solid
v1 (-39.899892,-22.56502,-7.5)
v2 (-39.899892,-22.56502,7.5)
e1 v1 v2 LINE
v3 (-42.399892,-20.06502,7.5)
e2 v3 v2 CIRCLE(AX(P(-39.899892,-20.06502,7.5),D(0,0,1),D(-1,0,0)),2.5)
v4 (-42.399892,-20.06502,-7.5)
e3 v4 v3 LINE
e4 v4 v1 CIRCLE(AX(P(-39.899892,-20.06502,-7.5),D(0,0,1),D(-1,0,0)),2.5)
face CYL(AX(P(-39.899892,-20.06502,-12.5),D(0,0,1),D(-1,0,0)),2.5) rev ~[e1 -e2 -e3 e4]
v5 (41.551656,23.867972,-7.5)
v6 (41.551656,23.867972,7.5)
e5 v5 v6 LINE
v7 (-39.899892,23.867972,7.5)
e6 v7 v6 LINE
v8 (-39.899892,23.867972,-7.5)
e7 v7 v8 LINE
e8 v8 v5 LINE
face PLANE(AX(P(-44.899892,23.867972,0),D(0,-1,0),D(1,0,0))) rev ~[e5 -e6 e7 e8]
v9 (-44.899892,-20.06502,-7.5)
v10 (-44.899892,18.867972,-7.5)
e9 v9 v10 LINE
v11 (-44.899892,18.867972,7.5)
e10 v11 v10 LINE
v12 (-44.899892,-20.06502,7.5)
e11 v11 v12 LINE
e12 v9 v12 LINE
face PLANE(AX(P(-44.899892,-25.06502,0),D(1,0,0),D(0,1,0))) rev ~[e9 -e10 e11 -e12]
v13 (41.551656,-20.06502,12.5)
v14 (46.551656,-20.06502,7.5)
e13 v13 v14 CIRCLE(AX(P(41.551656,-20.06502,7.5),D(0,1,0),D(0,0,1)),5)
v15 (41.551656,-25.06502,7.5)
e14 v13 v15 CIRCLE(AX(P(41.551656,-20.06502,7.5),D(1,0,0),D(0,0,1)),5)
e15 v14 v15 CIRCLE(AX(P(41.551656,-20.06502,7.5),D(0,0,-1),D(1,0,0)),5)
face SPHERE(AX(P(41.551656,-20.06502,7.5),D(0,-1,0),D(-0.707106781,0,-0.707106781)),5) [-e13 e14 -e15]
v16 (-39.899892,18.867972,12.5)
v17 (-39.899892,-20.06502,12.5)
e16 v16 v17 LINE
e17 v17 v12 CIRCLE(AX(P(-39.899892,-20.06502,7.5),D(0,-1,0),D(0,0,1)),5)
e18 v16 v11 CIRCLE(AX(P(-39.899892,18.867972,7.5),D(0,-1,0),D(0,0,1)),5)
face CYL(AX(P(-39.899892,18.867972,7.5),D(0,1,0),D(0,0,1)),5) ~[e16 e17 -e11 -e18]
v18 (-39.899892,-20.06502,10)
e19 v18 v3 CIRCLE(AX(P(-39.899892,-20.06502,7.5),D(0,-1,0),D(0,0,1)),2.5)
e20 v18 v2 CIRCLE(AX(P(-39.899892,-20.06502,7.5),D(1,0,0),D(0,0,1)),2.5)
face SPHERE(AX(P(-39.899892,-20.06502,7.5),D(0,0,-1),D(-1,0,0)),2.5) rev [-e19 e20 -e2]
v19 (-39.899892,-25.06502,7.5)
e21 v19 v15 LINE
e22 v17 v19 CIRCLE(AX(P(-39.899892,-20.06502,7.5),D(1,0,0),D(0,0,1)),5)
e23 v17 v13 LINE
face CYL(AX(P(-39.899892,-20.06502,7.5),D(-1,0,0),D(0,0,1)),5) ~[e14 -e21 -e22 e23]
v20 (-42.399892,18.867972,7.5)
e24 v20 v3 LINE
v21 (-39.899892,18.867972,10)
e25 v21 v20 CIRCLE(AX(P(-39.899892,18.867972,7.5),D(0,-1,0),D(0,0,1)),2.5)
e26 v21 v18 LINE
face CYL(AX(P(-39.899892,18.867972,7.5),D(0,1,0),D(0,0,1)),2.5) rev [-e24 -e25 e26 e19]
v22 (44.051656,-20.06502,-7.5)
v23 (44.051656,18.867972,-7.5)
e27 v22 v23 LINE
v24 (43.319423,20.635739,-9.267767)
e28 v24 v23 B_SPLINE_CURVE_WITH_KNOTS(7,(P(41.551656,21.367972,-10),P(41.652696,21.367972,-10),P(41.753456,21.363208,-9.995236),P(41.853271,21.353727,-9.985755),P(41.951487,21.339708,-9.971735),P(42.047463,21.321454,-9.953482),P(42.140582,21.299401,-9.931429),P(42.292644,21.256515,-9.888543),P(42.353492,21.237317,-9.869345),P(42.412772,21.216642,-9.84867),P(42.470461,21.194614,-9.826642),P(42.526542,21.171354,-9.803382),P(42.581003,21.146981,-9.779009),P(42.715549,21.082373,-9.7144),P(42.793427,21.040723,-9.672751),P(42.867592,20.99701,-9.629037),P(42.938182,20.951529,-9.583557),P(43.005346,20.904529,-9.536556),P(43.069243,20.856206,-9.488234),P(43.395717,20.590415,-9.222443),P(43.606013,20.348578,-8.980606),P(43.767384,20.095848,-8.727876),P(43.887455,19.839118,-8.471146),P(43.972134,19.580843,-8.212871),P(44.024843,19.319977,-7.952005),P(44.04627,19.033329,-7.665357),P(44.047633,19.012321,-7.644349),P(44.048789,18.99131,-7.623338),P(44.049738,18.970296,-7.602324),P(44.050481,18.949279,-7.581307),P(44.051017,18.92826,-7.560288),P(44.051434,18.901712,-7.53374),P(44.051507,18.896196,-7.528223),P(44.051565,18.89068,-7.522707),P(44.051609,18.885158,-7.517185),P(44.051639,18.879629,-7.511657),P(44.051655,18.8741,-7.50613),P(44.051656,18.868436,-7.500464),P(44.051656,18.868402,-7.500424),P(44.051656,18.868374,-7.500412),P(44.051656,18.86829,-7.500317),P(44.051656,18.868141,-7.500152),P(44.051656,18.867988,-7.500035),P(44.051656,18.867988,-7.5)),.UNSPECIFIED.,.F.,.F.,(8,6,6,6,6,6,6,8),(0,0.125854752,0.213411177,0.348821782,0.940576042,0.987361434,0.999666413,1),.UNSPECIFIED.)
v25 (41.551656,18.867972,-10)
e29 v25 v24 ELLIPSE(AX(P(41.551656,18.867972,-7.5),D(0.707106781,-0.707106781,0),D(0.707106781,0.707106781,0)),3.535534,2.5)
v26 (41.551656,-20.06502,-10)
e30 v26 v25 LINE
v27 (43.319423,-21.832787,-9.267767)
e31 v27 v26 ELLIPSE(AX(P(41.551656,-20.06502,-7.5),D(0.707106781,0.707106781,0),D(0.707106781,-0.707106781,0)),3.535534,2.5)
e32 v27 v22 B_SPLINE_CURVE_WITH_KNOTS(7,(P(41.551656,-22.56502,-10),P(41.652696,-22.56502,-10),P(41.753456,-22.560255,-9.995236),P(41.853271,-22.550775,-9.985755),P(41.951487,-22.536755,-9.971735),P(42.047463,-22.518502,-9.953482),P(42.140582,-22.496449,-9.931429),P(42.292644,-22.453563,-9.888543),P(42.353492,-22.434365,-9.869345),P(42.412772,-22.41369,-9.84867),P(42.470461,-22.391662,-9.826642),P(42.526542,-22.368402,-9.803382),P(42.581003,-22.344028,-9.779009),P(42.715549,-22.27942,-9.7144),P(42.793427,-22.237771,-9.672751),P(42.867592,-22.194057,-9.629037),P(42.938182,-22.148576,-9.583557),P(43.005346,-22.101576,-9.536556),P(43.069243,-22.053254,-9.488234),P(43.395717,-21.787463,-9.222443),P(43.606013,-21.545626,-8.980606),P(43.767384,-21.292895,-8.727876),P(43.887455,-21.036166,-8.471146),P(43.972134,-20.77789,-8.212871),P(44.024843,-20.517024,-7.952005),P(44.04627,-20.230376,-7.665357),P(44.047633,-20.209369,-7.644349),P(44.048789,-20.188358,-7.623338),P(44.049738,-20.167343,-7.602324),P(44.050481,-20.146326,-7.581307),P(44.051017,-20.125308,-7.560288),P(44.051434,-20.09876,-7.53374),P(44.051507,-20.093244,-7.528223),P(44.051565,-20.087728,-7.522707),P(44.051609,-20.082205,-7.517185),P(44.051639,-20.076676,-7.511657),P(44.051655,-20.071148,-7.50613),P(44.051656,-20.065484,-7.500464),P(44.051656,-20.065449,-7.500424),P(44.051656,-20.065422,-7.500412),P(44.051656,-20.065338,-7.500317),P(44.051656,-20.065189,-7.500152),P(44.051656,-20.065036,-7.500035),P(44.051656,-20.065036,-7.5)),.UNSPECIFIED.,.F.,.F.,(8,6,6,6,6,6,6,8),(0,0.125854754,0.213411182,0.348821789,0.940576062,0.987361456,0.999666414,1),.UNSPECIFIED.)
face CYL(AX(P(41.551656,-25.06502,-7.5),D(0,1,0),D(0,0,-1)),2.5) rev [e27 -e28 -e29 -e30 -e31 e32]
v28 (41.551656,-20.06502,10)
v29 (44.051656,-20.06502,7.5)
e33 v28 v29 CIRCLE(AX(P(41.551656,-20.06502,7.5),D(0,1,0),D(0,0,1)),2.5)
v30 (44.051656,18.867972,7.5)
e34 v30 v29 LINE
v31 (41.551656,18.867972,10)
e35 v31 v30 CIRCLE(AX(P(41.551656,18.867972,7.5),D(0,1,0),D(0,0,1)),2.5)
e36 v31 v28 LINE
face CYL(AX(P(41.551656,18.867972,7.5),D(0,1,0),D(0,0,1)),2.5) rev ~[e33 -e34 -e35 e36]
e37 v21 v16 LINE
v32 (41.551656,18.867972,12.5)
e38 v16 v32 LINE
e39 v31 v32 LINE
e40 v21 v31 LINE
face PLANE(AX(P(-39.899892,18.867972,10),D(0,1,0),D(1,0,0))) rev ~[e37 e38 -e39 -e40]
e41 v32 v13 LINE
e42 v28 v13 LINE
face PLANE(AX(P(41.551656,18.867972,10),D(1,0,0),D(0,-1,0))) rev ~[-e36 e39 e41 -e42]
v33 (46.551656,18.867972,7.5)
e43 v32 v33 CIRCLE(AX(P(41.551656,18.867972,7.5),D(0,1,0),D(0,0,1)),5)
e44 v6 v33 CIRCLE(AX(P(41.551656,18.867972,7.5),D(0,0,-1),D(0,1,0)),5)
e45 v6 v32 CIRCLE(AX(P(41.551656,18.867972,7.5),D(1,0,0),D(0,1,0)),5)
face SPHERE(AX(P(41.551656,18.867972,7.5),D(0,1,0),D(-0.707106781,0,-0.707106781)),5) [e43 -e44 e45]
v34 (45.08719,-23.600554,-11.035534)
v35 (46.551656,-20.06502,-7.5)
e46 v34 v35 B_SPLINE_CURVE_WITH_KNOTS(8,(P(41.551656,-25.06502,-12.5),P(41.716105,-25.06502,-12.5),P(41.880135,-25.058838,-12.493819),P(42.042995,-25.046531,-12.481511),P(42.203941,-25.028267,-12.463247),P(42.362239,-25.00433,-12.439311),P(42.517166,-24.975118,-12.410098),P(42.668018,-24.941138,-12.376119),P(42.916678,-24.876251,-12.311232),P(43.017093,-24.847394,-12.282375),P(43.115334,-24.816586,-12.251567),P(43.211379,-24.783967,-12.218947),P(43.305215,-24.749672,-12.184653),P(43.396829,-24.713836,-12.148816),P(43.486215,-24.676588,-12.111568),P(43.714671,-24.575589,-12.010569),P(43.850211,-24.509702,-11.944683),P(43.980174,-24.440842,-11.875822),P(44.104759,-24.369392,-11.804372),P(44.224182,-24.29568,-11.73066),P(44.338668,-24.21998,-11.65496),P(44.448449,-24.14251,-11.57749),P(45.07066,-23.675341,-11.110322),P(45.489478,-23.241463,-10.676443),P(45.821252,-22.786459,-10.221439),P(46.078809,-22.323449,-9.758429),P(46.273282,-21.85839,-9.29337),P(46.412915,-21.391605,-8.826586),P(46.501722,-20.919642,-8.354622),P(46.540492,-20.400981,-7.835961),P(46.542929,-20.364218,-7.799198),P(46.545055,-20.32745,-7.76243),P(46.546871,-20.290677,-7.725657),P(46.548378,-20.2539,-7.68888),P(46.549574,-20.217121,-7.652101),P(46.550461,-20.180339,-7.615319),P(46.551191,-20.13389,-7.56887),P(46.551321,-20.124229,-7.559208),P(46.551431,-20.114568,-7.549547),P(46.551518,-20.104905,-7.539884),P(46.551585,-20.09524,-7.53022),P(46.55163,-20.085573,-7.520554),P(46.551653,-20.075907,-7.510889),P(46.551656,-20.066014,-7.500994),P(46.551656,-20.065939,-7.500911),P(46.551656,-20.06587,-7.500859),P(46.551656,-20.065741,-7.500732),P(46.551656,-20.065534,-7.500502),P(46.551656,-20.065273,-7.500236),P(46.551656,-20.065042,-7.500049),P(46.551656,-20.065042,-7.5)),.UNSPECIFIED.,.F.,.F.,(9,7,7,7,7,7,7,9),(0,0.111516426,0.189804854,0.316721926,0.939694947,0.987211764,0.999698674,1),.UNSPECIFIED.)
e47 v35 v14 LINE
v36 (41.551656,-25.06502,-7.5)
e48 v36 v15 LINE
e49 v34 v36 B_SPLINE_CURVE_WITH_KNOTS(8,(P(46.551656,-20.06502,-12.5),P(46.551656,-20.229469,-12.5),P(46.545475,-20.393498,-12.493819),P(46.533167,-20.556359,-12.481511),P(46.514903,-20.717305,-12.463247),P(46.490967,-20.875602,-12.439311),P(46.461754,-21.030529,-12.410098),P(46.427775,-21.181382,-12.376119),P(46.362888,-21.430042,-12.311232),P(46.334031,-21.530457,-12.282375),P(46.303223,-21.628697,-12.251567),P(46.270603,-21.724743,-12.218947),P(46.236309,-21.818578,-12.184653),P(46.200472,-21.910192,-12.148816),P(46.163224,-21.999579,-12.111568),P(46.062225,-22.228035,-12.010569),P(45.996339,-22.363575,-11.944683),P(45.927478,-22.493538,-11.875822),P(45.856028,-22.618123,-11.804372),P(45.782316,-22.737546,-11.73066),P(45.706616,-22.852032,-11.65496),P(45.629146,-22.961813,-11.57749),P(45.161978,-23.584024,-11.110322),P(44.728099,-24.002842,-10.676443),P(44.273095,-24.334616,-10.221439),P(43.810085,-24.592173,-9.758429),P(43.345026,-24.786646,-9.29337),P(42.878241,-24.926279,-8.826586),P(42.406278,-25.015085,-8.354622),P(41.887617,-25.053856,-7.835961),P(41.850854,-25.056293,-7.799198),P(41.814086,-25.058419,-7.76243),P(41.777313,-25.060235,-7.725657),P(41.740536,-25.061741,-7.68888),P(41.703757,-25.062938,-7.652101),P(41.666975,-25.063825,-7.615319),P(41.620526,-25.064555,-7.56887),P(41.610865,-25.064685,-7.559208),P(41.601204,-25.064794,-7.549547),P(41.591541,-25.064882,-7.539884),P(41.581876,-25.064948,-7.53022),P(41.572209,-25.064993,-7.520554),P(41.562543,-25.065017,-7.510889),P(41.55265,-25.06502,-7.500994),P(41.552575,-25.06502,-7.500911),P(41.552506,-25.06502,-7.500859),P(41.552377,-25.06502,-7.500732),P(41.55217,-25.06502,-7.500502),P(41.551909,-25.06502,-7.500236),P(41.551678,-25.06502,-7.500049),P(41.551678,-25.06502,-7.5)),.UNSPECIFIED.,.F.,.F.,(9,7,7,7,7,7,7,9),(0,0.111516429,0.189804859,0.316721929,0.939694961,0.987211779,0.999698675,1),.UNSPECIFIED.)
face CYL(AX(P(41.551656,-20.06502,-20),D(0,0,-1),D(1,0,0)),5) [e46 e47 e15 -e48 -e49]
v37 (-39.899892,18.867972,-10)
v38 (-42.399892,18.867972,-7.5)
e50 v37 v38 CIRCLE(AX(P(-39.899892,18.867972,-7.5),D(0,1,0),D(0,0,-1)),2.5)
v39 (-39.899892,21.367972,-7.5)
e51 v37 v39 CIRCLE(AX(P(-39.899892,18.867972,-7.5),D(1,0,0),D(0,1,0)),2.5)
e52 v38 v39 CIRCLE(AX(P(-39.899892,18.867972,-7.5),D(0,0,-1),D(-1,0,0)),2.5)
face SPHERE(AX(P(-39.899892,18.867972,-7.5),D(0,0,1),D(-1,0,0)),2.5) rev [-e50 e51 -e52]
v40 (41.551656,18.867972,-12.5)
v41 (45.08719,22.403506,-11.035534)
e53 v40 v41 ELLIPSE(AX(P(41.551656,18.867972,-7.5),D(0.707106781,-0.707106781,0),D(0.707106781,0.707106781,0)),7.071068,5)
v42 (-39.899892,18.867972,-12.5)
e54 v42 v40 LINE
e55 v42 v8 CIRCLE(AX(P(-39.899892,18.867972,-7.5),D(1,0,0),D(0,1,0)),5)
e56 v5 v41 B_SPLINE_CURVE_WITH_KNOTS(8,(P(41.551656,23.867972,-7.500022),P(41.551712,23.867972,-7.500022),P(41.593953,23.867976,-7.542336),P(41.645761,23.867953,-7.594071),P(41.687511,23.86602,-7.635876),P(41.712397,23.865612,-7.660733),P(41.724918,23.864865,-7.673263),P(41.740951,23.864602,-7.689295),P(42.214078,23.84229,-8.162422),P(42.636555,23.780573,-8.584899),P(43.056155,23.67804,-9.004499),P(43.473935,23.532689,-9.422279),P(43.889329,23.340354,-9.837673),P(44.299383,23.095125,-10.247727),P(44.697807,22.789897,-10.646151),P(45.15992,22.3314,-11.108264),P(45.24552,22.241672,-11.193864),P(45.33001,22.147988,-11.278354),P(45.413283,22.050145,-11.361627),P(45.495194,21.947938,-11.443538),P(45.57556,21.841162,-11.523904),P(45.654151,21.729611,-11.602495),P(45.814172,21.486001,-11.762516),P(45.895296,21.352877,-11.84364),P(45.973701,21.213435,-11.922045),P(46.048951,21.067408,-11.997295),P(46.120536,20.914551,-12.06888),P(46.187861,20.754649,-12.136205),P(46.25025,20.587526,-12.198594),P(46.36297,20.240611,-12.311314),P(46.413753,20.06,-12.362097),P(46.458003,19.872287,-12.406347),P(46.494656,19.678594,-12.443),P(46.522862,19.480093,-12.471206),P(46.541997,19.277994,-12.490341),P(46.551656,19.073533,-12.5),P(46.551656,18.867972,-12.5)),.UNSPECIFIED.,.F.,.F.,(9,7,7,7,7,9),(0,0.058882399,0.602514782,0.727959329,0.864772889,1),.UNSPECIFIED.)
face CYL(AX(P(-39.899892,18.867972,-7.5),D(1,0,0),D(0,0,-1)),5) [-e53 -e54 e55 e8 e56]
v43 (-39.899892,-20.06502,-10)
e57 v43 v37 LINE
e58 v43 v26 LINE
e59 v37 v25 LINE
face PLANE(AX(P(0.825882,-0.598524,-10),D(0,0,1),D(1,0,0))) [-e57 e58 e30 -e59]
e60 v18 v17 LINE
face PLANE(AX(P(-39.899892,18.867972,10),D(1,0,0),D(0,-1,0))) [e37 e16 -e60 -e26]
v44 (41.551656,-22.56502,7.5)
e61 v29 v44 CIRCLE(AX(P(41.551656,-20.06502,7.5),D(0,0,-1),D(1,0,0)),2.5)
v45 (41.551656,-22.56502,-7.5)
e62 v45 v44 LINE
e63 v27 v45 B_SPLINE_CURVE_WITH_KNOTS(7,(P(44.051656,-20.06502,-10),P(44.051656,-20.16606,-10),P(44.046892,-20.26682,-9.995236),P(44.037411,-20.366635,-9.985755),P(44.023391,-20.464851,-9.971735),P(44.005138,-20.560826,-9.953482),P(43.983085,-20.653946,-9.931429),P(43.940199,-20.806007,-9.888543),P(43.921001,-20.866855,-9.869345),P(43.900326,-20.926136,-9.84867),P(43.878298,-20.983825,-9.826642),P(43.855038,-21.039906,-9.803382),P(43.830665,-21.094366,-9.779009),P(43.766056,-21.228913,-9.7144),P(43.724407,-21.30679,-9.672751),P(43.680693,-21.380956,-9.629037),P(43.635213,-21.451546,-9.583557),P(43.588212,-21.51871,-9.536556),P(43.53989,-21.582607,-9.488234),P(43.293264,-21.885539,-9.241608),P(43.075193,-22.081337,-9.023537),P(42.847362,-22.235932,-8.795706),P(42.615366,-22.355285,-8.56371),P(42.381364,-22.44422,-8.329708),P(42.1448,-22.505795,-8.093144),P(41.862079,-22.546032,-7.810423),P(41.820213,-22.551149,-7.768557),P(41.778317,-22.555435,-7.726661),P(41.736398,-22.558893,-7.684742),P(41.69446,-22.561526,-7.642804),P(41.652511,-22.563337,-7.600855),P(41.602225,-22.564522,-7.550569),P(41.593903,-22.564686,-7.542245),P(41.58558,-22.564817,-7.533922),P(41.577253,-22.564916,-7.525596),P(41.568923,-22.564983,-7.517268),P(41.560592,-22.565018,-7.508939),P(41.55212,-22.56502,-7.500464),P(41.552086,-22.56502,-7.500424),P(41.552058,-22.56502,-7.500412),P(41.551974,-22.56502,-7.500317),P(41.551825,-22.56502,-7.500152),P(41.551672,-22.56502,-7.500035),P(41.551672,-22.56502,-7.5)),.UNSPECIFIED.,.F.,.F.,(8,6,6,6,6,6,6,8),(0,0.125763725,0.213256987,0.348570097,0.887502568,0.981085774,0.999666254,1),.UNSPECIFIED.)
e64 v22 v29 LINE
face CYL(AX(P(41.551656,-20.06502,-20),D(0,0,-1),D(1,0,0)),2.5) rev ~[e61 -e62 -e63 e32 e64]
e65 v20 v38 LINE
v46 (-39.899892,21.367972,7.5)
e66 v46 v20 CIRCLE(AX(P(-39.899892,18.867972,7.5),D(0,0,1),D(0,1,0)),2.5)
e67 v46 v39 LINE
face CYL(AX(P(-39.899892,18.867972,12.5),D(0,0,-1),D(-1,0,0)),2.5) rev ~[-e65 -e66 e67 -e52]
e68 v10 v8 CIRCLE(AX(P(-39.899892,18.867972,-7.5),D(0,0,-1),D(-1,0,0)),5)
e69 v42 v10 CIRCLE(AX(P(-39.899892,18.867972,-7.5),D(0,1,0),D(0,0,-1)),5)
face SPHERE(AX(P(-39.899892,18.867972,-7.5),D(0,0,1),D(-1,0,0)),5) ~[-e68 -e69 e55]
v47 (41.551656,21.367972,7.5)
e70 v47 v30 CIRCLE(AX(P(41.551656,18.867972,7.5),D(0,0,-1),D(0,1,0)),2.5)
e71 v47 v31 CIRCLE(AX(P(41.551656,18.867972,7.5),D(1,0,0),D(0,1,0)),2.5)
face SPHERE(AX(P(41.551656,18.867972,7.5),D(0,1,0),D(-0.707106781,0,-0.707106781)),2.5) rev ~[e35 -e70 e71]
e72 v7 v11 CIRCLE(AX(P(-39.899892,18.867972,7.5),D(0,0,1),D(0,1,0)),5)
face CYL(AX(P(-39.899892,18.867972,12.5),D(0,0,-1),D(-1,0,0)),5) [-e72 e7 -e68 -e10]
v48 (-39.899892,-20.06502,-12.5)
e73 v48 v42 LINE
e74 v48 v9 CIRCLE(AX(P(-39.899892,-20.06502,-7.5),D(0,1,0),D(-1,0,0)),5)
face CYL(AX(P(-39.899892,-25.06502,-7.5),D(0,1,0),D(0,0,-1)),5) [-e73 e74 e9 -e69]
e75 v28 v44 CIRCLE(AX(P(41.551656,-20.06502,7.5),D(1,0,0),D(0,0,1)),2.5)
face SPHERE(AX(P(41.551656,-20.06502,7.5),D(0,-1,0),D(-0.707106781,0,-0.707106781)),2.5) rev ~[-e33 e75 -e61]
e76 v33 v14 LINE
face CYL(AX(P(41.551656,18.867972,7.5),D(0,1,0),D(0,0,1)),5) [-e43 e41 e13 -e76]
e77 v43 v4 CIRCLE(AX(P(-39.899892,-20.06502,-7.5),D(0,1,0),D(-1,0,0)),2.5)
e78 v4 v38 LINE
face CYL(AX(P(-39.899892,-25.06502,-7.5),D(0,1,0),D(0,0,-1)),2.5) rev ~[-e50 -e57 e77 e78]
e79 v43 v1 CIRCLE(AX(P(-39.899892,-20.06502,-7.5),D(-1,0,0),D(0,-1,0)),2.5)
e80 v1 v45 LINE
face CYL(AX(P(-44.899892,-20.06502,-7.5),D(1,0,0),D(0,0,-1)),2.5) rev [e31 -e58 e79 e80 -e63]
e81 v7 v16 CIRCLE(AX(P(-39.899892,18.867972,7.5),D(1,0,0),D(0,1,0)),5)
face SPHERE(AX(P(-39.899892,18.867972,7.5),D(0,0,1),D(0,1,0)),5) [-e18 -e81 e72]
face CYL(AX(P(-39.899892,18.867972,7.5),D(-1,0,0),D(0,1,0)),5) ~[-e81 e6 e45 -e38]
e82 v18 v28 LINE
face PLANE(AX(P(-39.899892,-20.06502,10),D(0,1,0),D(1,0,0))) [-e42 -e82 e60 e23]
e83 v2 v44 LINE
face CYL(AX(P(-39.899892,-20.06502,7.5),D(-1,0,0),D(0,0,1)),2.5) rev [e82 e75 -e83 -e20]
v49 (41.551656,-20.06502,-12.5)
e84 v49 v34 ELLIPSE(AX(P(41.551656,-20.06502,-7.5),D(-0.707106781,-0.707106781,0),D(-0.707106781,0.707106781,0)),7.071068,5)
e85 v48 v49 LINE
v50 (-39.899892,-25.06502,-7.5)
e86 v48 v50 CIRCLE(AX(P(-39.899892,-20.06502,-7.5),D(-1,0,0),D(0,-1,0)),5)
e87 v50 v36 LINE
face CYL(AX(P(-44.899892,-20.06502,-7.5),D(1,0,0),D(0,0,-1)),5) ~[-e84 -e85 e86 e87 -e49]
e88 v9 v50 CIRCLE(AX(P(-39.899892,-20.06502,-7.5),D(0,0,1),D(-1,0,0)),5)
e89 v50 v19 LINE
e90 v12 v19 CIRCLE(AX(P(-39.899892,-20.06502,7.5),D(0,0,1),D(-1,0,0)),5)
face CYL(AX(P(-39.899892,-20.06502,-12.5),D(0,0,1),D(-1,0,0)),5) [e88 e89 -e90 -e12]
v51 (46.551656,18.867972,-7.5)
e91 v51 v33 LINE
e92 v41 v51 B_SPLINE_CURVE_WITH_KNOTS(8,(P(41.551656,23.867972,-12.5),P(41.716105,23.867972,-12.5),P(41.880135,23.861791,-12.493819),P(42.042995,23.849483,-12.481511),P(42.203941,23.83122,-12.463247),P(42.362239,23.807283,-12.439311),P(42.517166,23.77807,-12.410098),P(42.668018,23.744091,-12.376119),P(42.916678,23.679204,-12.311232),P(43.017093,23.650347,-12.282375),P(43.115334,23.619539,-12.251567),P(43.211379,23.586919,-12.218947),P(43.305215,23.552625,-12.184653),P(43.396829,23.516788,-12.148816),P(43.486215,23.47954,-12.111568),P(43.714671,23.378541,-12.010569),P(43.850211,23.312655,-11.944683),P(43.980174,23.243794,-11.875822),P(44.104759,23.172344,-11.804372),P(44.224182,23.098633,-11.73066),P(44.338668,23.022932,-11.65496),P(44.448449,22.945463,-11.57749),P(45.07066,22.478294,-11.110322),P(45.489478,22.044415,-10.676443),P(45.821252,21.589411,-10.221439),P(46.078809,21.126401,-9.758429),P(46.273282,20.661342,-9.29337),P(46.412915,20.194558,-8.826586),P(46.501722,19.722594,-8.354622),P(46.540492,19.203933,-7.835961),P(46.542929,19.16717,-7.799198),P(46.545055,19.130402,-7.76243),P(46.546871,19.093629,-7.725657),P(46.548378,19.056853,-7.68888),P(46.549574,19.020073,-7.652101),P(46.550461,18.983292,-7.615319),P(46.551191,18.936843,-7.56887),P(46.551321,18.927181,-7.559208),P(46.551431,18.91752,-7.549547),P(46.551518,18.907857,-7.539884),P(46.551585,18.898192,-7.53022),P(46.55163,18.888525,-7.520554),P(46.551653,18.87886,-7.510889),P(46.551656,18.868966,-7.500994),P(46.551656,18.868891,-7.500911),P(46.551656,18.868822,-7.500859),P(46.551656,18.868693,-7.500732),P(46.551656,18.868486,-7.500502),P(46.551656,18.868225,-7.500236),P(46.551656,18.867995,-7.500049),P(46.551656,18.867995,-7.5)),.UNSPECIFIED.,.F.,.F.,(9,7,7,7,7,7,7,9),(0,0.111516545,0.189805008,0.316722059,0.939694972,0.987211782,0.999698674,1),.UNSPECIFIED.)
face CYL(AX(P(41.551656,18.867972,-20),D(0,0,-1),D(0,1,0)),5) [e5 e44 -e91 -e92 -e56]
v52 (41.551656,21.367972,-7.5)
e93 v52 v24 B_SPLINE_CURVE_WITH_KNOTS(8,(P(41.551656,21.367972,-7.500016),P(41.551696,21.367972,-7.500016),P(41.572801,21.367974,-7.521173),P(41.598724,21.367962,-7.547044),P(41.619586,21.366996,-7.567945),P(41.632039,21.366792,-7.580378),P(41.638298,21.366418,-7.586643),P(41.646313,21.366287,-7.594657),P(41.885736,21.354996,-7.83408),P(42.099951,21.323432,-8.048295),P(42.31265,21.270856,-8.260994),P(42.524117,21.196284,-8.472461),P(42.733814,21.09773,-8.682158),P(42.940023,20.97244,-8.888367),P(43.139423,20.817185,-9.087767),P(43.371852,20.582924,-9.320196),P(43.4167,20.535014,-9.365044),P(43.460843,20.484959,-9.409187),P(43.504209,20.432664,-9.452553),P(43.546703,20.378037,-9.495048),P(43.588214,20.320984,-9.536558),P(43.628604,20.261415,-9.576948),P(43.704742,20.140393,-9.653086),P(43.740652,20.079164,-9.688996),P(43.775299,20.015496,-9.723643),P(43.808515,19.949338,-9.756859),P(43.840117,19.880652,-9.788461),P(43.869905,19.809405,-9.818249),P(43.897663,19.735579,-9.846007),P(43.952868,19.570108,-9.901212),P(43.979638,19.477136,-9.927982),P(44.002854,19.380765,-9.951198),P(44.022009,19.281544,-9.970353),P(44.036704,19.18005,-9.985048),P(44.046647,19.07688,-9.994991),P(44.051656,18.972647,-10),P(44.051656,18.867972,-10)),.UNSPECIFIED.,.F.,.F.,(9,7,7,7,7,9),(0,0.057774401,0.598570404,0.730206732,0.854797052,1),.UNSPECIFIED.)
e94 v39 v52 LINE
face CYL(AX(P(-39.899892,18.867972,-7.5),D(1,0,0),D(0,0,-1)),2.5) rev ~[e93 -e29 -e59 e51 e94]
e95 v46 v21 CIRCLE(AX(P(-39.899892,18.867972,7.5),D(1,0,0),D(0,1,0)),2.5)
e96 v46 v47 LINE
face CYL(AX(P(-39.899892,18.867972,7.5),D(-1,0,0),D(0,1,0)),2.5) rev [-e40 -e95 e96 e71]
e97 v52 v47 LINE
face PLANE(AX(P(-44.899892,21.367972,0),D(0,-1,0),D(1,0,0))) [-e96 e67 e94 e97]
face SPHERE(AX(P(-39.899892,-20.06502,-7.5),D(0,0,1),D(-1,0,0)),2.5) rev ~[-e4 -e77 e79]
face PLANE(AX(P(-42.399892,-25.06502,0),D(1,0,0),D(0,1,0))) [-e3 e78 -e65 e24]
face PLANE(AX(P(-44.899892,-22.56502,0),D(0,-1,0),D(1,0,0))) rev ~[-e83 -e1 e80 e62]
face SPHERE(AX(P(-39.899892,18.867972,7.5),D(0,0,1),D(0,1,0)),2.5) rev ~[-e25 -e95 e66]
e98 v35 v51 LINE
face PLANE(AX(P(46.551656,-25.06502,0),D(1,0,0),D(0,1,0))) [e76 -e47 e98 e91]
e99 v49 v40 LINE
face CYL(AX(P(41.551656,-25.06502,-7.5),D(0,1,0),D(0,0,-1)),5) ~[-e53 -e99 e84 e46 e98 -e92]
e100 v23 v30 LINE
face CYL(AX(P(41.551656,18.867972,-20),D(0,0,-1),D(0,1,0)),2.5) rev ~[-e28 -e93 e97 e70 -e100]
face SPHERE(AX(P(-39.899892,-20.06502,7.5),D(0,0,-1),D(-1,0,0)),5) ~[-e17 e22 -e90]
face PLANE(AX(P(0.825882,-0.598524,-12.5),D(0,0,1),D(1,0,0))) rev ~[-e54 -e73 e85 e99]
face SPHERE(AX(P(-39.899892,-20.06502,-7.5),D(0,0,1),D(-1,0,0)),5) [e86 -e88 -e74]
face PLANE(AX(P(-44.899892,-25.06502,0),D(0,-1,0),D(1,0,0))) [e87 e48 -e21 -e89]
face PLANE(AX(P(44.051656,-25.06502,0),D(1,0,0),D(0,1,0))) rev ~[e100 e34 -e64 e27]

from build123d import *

# Parameters (mm, degrees)
F0_W         = 91.4515480399
F0_H         = 48.9329919219
F1_DEPTH     = 12.5
F2_R         = 5
F3_R         = 5
F4_T1_DEPTH  = 27.5
F4_T3_DEPTH  = 38.9329919219
F4_T5_DEPTH  = 81.4515480399
F4_S9_W      = 5.1
F4_S9_H      = 5.1
F4_T10_DEPTH = 5.1
F4_S15_W     = 5.1
F4_S15_H     = 5.1
F4_T16_DEPTH = 5.1
F4_T20_ANGLE = 90
F4_T22_ANGLE = 90
F5_T         = -2.5


# Not quite as in the source:
# - a fillet or chamfer that OpenCascade refuses, or shapes differently, is made with other operations: its cross-section is extruded or revolved along the edge and cut away or added
# - a shell that OpenCascade refuses in one call is made with other operations: the cavity is built on its own and cut out


with BuildPart() as f1:
    # F0 (on Top) → F1 (new body, symmetric)
    with BuildSketch(Plane.XY):
        with Locations((0.825881958, -0.5985237658)):
            Rectangle(F0_W, F0_H)
    extrude(amount=F1_DEPTH, both=True)

    # F2
    f2_edges = [f1.edges().sort_by_distance(p)[0] for p in [
        (-44.899892, 23.867972, 0),
    ]]
    fillet(f2_edges, radius=F2_R)

    # F3
    f3_edges = [f1.edges().sort_by_distance(p)[0] for p in [
        (-44.899892, -25.06502, 0),
        (3.325882, 23.867972, -12.5),
        (-43.435426, 22.403506, -12.5),
        (46.551656, -0.598524, -12.5),
        (-44.899892, -3.098524, -12.5),
        (0.825882, -25.06502, -12.5),
    ]]
    fillet(f3_edges, radius=F3_R)

    # F4: fillet of radius 5 on 9 edges, made by hand

    # F4_s2 → F4_t1 (cut)
    with BuildSketch(Plane.XY.offset(-20)):
        with BuildLine():
            ThreePointArc((41.551655978, 23.8679721951), (45.0871898839, 22.4035061011), (46.551655978, 18.8679721951))
            Line((46.551655978, 18.8679721951), (46.551655978, 23.8679721951))
            Line((46.551655978, 23.8679721951), (41.551655978, 23.8679721951))
        make_face()
        with BuildLine():
            ThreePointArc((46.551655978, -20.0650197268), (45.0871898839, -23.6005536327), (41.551655978, -25.0650197268))
            Line((41.551655978, -25.0650197268), (46.551655978, -25.0650197268))
            Line((46.551655978, -25.0650197268), (46.551655978, -20.0650197268))
        make_face()
    extrude(amount=F4_T1_DEPTH, mode=Mode.SUBTRACT)

    # F4_s4 → F4_t3 (cut)
    with BuildSketch(Plane.XZ.offset(-18.8679721951)):
        with BuildLine():
            ThreePointArc((41.551655978, 12.5), (45.0871898839, 11.0355339059), (46.551655978, 7.5))
            Line((46.551655978, 7.5), (46.551655978, 12.5))
            Line((46.551655978, 12.5), (41.551655978, 12.5))
        make_face()
        with BuildLine():
            ThreePointArc((-39.8998920619, 12.5), (-43.4354259679, 11.0355339059), (-44.8998920619, 7.5))
            Line((-44.8998920619, 7.5), (-44.8998920619, 12.5))
            Line((-44.8998920619, 12.5), (-39.8998920619, 12.5))
        make_face()
    extrude(amount=F4_T3_DEPTH, mode=Mode.SUBTRACT)

    # F4_s6 → F4_t5 (cut)
    with BuildSketch(Plane.YZ.offset(-39.8998920619)):
        with BuildLine():
            ThreePointArc((23.8679721951, 7.5), (22.4035061011, 11.0355339059), (18.8679721951, 12.5))
            Line((18.8679721951, 12.5), (23.8679721951, 12.5))
            Line((23.8679721951, 12.5), (23.8679721951, 7.5))
        make_face()
        with BuildLine():
            ThreePointArc((-20.0650197268, 12.5), (-23.6005536327, 11.0355339059), (-25.0650197268, 7.5))
            Line((-25.0650197268, 7.5), (-25.0650197268, 12.5))
            Line((-25.0650197268, 12.5), (-20.0650197268, 12.5))
        make_face()
    extrude(amount=F4_T5_DEPTH, mode=Mode.SUBTRACT)


with BuildPart() as f4_tool8:
    # F4_s9 → F4_t10 (new body)
    with BuildSketch(Plane.XZ.offset(-18.8679721951)):
        with Locations((44.101655978, 10.05)):
            Rectangle(F4_S9_W, F4_S9_H)
    extrude(amount=-F4_T10_DEPTH)

    # F4_s11 → F4_t12 (revolve, cut)
    with BuildSketch(Plane(origin=(41.551655978, 18.8679721951, 7.5), x_dir=(-0.7071067812, 0, -0.7071067812), z_dir=(0.7071067812, 0, -0.7071067812))):
        with BuildLine():
            ThreePointArc((0, -5), (5, 0), (0, 5))
            Line((0, 5), (0, -5))
        make_face()
    revolve(axis=Axis((41.551655978, 18.8679721951, 7.5), (0, 1, 0)), mode=Mode.SUBTRACT)


with BuildPart() as f1_1:
    add(f1.part)

    # F4_t7: cut F4_tool8
    add(f4_tool8.part, mode=Mode.SUBTRACT)


with BuildPart() as f4_tool14:
    # F4_s15 → F4_t16 (new body)
    with BuildSketch(Plane.XZ.offset(20.0650197268)):
        with Locations((44.101655978, 10.05)):
            Rectangle(F4_S15_W, F4_S15_H)
    extrude(amount=F4_T16_DEPTH)

    # F4_s17 → F4_t18 (revolve, cut)
    with BuildSketch(Plane(origin=(41.551655978, -20.0650197268, 7.5), x_dir=(-0.7071067812, 0, -0.7071067812), z_dir=(-0.7071067812, 0, 0.7071067812))):
        with BuildLine():
            ThreePointArc((0, -5), (5, 0), (0, 5))
            Line((0, 5), (0, -5))
        make_face()
    revolve(axis=Axis((41.551655978, -20.0650197268, 7.5), (0, -1, 0)), mode=Mode.SUBTRACT)


with BuildPart() as f1_2:
    add(f1_1.part)

    # F4_t13: cut F4_tool14
    add(f4_tool14.part, mode=Mode.SUBTRACT)

    # F4_s19 → F4_t20 (revolve, cut)
    with BuildSketch(Plane.YZ.offset(-39.8998920619)):
        with BuildLine():
            ThreePointArc((23.8679721951, 7.5), (22.4035061011, 11.0355339059), (18.8679721951, 12.5))
            Line((18.8679721951, 12.5), (23.8679721951, 12.5))
            Line((23.8679721951, 12.5), (23.8679721951, 7.5))
        make_face()
    revolve(axis=Axis((-39.8998920619, 18.8679721951, 12.5), (0, 0, 1)), revolution_arc=F4_T20_ANGLE, mode=Mode.SUBTRACT)

    # F4_s21 → F4_t22 (revolve, cut)
    with BuildSketch(Plane.XZ.offset(20.0650197268)):
        with BuildLine():
            ThreePointArc((-39.8998920619, 12.5), (-43.4354259679, 11.0355339059), (-44.8998920619, 7.5))
            Line((-44.8998920619, 7.5), (-44.8998920619, 12.5))
            Line((-44.8998920619, 12.5), (-39.8998920619, 12.5))
        make_face()
    revolve(axis=Axis((-39.8998920619, -20.0650197268, 12.5), (0, 0, 1)), revolution_arc=F4_T22_ANGLE, mode=Mode.SUBTRACT)

    # F5: a shell. OpenCascade refuses it in one call, so the cavity is built on its own and cut out:
    # the body offset inwards by the wall thickness, plus a prism from it out through each open face.
    f5_core = offset(f1_2.part, amount=F5_T, mode=Mode.PRIVATE)
    f5_exits = [f5_core.faces().sort_by_distance(p)[0] for p in [
        (0.825882, -0.598524, 10),
    ]]
    add(f5_core, mode=Mode.SUBTRACT)
    extrude(f5_exits, amount=-F5_T, mode=Mode.SUBTRACT)


solid = f1_2.part
